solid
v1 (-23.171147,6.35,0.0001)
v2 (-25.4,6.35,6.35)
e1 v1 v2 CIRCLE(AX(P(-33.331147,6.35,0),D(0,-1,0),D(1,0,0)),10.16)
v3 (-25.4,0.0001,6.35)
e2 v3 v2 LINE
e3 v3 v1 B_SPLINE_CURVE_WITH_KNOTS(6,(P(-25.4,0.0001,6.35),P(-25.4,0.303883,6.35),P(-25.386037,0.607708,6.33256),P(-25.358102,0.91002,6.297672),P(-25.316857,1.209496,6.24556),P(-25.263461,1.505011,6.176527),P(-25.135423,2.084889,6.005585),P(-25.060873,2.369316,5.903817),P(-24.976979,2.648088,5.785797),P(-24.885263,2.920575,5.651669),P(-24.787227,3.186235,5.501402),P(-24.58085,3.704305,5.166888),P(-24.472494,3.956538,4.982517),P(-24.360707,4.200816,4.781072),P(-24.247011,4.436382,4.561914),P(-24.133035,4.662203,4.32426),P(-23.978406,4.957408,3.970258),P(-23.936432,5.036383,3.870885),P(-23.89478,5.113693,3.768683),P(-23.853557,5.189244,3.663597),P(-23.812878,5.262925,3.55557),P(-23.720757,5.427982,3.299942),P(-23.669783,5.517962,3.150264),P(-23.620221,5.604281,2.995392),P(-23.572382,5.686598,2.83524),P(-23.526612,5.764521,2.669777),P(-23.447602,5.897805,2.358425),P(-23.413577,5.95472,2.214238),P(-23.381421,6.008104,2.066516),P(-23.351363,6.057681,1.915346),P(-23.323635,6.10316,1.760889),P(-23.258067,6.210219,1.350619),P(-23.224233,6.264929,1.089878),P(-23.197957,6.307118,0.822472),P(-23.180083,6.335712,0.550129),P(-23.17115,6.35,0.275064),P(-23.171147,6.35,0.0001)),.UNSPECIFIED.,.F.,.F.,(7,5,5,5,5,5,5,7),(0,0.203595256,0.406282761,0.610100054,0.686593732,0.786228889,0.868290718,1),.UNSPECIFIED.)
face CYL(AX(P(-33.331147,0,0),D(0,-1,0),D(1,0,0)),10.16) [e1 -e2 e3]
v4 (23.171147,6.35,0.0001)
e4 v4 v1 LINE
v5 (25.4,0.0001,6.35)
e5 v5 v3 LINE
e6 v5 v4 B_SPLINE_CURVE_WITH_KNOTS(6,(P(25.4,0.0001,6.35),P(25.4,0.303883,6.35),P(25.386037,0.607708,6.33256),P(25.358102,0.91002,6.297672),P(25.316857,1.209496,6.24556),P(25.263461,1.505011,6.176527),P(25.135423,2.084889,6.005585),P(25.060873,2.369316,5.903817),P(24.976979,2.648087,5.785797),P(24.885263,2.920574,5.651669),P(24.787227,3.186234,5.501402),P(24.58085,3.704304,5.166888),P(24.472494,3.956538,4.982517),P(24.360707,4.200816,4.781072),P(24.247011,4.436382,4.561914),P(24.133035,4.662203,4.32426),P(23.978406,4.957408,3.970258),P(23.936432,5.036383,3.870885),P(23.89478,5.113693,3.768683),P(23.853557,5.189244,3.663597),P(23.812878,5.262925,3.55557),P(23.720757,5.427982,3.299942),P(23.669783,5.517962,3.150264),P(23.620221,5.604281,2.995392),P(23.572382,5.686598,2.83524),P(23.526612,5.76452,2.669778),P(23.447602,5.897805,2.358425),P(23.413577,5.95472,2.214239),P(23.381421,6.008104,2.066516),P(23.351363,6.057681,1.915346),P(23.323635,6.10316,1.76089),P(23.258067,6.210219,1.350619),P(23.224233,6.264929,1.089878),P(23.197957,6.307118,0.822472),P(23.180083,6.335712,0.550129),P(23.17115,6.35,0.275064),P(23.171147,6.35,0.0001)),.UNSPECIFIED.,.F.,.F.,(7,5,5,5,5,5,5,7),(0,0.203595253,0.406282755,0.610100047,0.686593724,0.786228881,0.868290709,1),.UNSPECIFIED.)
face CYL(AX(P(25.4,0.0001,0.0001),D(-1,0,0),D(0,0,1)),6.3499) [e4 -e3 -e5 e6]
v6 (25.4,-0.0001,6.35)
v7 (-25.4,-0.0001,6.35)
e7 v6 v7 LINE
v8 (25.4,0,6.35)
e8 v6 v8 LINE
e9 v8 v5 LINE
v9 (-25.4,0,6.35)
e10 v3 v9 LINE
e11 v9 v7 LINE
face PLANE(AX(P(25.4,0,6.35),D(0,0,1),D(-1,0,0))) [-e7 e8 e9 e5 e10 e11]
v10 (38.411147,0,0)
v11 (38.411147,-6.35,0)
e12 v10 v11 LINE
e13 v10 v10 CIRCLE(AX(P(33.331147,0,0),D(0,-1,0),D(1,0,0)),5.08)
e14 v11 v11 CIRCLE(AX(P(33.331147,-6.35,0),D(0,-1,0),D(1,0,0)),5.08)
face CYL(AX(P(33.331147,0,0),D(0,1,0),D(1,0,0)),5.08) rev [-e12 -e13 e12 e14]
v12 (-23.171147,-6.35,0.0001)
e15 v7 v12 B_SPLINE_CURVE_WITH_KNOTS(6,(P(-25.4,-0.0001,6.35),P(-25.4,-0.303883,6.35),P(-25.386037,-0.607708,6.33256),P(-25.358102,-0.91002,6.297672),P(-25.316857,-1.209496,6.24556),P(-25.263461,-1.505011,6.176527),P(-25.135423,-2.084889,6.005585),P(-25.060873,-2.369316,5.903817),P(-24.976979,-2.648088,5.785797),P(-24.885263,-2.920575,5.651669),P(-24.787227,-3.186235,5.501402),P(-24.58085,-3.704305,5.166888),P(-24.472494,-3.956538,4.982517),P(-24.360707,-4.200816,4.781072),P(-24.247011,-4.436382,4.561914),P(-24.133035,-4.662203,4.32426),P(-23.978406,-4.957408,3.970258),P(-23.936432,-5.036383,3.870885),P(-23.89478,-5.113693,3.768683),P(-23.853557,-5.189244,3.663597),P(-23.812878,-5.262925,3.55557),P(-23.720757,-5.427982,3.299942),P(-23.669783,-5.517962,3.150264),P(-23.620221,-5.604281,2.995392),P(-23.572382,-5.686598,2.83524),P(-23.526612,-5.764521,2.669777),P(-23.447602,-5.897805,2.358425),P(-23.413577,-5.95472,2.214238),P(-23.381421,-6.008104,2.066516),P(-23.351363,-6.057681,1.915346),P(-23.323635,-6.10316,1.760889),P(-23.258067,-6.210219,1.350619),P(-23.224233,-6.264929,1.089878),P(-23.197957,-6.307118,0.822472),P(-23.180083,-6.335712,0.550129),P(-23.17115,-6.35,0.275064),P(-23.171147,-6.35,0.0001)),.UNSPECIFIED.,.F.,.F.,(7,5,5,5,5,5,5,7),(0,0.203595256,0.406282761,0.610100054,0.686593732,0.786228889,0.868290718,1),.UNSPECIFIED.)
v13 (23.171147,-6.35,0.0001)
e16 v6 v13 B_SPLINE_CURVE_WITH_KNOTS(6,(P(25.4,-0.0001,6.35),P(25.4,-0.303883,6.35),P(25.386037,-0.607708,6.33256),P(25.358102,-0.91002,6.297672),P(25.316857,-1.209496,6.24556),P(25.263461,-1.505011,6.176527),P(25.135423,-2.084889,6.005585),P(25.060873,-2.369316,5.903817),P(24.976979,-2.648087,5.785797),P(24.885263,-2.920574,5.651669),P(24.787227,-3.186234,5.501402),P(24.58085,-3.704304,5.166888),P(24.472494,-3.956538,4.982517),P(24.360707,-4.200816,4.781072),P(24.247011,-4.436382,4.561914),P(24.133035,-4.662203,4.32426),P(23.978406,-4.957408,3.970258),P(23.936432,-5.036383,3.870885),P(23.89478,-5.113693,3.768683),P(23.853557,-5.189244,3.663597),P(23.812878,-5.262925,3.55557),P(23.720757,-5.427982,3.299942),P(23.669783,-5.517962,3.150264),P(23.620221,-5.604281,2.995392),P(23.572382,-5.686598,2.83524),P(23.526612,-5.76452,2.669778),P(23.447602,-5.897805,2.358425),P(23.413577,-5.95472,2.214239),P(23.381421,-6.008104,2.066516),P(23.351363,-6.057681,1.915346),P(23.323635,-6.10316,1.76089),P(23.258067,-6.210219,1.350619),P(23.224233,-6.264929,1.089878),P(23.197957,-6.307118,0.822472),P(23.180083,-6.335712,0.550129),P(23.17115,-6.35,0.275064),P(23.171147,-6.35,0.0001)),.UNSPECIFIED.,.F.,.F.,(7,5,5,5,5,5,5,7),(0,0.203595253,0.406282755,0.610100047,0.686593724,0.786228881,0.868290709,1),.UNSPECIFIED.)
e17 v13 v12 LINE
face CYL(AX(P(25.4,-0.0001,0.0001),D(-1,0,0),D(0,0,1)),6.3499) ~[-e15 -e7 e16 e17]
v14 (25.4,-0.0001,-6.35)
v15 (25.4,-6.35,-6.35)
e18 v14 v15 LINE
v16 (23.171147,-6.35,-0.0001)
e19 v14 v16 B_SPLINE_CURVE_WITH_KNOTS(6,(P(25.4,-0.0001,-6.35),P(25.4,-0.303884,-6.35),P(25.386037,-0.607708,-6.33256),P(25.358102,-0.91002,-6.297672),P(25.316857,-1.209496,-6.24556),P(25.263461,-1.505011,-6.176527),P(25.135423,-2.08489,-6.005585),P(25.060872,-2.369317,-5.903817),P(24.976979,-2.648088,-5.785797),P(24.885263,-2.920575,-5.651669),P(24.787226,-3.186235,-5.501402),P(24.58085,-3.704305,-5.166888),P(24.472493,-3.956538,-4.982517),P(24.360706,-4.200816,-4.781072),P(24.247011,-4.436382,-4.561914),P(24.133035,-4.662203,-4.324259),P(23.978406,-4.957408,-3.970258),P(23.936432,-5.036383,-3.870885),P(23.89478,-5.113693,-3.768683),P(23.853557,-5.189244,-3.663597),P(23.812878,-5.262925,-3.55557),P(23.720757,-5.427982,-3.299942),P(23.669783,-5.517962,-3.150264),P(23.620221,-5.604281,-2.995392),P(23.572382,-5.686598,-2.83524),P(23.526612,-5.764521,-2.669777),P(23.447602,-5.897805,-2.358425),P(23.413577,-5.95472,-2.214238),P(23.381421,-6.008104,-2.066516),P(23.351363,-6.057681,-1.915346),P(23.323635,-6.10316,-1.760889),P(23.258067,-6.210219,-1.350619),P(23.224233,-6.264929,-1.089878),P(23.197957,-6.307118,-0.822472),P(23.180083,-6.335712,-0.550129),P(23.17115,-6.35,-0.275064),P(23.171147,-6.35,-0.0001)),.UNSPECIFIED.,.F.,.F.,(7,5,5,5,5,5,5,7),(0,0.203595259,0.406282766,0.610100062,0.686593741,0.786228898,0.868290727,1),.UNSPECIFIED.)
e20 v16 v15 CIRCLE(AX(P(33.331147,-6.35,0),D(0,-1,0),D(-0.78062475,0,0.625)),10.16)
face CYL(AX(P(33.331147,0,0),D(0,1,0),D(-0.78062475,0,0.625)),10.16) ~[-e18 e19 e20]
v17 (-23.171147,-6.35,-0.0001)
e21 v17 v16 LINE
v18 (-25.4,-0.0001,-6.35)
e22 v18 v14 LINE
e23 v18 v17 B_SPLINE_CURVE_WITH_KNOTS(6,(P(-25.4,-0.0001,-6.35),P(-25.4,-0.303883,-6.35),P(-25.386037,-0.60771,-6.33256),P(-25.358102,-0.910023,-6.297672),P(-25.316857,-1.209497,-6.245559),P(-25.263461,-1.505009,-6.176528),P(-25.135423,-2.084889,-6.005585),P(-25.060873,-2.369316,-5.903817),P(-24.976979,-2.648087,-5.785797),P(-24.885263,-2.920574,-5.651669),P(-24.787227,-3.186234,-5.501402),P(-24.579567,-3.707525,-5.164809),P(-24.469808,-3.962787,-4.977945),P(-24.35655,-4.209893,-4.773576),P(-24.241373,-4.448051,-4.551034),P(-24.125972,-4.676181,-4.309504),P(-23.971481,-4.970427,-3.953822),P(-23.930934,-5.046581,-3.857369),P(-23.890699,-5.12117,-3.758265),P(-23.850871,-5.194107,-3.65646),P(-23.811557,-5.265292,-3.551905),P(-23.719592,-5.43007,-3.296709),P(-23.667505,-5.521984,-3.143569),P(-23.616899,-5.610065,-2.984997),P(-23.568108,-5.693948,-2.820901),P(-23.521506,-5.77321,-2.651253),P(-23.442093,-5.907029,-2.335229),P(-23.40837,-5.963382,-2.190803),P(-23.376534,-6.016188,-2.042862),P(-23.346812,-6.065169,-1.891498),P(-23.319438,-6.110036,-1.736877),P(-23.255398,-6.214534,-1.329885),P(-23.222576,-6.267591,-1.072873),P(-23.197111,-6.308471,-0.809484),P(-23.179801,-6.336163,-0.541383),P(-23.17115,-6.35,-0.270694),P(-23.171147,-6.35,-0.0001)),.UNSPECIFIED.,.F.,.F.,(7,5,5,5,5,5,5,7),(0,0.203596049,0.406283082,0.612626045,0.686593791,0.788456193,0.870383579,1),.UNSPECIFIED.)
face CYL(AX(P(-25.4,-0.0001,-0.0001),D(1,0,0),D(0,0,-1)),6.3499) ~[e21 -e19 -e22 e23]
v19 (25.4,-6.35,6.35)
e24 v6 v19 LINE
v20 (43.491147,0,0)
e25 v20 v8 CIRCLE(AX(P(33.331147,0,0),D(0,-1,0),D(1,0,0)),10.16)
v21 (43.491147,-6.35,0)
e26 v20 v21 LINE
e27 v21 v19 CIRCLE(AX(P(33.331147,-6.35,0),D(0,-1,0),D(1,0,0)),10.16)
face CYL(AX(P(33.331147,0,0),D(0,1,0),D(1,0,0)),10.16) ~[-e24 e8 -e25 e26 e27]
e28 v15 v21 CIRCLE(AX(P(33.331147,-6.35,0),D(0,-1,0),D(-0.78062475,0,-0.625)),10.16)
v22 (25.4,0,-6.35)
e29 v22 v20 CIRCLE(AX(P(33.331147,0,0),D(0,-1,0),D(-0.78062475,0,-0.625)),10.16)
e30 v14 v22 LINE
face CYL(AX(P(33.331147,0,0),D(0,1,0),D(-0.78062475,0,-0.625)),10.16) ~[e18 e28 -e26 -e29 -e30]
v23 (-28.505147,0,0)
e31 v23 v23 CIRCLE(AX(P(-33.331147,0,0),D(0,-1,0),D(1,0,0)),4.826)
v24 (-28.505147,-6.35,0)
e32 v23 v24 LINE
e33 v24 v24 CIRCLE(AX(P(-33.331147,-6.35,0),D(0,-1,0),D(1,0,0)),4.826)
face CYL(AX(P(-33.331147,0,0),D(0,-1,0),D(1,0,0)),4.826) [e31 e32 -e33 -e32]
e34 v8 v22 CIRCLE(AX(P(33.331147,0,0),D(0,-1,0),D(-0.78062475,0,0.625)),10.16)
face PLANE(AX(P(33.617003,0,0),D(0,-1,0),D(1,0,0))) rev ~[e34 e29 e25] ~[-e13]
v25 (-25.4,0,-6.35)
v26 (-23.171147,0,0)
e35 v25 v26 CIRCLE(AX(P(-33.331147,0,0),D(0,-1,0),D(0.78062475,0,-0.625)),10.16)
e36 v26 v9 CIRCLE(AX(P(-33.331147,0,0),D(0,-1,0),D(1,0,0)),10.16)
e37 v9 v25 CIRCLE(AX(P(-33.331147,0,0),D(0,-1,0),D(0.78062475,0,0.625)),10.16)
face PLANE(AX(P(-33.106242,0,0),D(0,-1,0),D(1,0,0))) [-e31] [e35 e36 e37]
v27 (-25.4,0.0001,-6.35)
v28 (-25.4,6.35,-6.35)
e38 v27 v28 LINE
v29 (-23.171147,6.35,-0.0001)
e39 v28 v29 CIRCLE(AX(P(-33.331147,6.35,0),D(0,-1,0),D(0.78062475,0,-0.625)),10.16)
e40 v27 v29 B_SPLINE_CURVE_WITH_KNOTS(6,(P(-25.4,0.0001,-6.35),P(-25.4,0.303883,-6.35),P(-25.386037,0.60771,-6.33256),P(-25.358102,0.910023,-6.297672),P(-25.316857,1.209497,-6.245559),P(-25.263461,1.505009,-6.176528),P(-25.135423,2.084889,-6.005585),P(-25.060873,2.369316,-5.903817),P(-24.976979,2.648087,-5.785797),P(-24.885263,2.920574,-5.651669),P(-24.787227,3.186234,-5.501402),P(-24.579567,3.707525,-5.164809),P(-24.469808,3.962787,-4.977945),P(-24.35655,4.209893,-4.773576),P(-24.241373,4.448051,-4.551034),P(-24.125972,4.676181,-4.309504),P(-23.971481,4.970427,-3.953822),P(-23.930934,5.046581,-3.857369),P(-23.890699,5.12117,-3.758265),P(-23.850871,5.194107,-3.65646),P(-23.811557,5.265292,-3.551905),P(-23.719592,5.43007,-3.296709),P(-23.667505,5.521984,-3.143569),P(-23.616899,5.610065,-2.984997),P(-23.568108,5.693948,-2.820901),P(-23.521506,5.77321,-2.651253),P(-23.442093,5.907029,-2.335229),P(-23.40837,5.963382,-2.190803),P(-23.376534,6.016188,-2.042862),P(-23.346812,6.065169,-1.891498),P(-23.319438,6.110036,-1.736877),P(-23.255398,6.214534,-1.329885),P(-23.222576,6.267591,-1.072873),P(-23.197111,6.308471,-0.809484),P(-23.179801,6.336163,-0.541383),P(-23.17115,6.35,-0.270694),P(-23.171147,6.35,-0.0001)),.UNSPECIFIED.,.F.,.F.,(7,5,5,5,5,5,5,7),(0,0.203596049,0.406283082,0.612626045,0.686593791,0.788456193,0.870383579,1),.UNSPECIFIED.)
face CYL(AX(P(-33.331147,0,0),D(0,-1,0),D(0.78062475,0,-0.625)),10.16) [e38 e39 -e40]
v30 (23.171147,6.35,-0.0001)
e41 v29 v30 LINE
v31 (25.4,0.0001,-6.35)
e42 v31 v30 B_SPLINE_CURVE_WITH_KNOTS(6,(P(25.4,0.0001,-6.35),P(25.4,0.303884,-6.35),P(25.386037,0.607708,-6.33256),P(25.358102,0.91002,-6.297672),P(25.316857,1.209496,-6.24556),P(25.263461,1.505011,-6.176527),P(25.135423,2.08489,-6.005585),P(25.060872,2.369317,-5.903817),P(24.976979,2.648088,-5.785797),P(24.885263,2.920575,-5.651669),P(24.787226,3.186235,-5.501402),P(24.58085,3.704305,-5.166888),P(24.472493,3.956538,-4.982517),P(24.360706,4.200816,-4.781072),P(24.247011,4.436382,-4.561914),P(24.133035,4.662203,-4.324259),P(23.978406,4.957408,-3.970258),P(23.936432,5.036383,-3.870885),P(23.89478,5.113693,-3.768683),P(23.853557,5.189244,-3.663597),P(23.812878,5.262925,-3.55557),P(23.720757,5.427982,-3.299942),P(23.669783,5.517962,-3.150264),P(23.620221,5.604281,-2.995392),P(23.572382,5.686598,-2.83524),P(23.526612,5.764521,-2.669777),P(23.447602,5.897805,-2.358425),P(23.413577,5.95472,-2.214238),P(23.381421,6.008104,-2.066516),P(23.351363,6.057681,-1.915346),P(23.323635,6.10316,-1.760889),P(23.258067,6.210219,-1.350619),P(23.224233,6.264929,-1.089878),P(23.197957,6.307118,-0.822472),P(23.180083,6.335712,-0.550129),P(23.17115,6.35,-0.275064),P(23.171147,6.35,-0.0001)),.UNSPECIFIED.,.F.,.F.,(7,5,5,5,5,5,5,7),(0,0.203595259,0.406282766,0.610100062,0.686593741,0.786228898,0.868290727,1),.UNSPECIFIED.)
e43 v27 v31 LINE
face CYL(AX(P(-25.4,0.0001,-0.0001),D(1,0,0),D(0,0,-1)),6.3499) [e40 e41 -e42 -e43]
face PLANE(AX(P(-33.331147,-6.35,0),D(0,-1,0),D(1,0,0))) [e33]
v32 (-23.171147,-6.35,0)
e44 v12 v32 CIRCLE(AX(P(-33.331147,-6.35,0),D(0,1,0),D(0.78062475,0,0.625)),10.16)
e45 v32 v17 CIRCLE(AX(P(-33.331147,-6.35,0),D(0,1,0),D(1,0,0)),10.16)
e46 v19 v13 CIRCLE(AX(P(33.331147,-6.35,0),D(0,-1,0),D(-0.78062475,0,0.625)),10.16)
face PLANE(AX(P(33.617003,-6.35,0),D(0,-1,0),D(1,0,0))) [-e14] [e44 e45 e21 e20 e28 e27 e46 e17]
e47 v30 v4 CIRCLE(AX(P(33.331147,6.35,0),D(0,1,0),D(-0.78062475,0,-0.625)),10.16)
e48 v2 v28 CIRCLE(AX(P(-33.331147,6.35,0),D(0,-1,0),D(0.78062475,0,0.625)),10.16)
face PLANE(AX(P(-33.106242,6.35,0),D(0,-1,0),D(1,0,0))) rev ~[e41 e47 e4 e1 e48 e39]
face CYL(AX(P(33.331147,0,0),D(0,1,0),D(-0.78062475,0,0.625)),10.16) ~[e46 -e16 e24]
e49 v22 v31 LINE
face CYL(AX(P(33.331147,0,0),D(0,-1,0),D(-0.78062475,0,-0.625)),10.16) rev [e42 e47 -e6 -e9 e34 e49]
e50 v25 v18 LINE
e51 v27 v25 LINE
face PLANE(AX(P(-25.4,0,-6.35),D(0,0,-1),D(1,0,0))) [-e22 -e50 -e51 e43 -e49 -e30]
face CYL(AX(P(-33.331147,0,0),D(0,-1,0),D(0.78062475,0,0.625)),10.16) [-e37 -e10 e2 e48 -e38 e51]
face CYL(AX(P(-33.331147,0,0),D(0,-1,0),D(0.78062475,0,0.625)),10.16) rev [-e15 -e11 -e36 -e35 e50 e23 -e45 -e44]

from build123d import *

# Parameters (mm, degrees)
F1_DEPTH = 6.35
F2_R     = 6.3499
F0_R     = 5.08
F3_DEPTH = 6.35
F0_R_2   = 4.826
F4_DEPTH = 6.35
F5_DEPTH = 6.35


# Not quite as in the source:
# - a fillet or chamfer is up to 0.001 mm smaller than in the source, because OpenCascade refuses the exact size


with BuildPart() as f1:
    # F0 (on Front) → F1 (new body, symmetric)
    with BuildSketch(Plane.XZ):
        with BuildLine():
            Line((25.4, 6.35), (-25.4, 6.35))
            ThreePointArc((-25.4, 6.35), (-23.7445407024, 3.3649028089), (-23.171147458, 0))
            ThreePointArc((-23.171147458, 0), (-23.7445407024, -3.3649028089), (-25.4, -6.35))
            Line((-25.4, -6.35), (25.4, -6.35))
            ThreePointArc((25.4, -6.35), (23.171147458, 0), (25.4, 6.35))
        make_face()
    extrude(amount=F1_DEPTH, both=True)

    # F2 (radius 6.35 in the source; OpenCascade refuses exactly that, so slightly less here)
    f2_edges = [f1.edges().sort_by_distance(p)[0] for p in [
        (0, -6.35, 6.35),
        (0, 6.35, 6.35),
        (0, -6.35, -6.35),
        (0, 6.35, -6.35),
    ]]
    fillet(f2_edges, radius=F2_R)

    # F0 (on Front) → F3 (join)
    with BuildSketch(Plane.XZ):
        with BuildLine():
            ThreePointArc((43.491147458, 0), (36.6960502669, 9.5866067556), (25.4, 6.35))
            Line((25.4, 6.35), (25.4, -6.35))
            ThreePointArc((25.4, -6.35), (36.6960502669, -9.5866067556), (43.491147458, 0))
        make_face()
        with Locations((33.331147458, 0)):
            Circle(F0_R, mode=Mode.SUBTRACT)
        with BuildLine():
            Line((25.4, -6.35), (25.4, 6.35))
            ThreePointArc((25.4, 6.35), (23.171147458, 0), (25.4, -6.35))
        make_face()
    extrude(amount=F3_DEPTH)

    # F0 (on Front) → F4 (join)
    with BuildSketch(Plane.XZ):
        with BuildLine():
            Line((-25.4, -6.35), (-25.4, 6.35))
            ThreePointArc((-25.4, 6.35), (-43.491147458, 0), (-25.4, -6.35))
        make_face()
        with Locations((-33.331147458, 0)):
            Circle(F0_R_2, mode=Mode.SUBTRACT)
        with BuildLine():
            ThreePointArc((-23.171147458, 0), (-23.7445407024, 3.3649028089), (-25.4, 6.35))
            Line((-25.4, 6.35), (-25.4, -6.35))
            ThreePointArc((-25.4, -6.35), (-23.7445407024, -3.3649028089), (-23.171147458, 0))
        make_face()
    extrude(amount=-F4_DEPTH)

    # F0 (on Front) → F5 (join, symmetric)
    with BuildSketch(Plane.XZ):
        with Locations((-33.331147458, 0)):
            Circle(F0_R_2)
    extrude(amount=F5_DEPTH, both=True)


solid = f1.part
